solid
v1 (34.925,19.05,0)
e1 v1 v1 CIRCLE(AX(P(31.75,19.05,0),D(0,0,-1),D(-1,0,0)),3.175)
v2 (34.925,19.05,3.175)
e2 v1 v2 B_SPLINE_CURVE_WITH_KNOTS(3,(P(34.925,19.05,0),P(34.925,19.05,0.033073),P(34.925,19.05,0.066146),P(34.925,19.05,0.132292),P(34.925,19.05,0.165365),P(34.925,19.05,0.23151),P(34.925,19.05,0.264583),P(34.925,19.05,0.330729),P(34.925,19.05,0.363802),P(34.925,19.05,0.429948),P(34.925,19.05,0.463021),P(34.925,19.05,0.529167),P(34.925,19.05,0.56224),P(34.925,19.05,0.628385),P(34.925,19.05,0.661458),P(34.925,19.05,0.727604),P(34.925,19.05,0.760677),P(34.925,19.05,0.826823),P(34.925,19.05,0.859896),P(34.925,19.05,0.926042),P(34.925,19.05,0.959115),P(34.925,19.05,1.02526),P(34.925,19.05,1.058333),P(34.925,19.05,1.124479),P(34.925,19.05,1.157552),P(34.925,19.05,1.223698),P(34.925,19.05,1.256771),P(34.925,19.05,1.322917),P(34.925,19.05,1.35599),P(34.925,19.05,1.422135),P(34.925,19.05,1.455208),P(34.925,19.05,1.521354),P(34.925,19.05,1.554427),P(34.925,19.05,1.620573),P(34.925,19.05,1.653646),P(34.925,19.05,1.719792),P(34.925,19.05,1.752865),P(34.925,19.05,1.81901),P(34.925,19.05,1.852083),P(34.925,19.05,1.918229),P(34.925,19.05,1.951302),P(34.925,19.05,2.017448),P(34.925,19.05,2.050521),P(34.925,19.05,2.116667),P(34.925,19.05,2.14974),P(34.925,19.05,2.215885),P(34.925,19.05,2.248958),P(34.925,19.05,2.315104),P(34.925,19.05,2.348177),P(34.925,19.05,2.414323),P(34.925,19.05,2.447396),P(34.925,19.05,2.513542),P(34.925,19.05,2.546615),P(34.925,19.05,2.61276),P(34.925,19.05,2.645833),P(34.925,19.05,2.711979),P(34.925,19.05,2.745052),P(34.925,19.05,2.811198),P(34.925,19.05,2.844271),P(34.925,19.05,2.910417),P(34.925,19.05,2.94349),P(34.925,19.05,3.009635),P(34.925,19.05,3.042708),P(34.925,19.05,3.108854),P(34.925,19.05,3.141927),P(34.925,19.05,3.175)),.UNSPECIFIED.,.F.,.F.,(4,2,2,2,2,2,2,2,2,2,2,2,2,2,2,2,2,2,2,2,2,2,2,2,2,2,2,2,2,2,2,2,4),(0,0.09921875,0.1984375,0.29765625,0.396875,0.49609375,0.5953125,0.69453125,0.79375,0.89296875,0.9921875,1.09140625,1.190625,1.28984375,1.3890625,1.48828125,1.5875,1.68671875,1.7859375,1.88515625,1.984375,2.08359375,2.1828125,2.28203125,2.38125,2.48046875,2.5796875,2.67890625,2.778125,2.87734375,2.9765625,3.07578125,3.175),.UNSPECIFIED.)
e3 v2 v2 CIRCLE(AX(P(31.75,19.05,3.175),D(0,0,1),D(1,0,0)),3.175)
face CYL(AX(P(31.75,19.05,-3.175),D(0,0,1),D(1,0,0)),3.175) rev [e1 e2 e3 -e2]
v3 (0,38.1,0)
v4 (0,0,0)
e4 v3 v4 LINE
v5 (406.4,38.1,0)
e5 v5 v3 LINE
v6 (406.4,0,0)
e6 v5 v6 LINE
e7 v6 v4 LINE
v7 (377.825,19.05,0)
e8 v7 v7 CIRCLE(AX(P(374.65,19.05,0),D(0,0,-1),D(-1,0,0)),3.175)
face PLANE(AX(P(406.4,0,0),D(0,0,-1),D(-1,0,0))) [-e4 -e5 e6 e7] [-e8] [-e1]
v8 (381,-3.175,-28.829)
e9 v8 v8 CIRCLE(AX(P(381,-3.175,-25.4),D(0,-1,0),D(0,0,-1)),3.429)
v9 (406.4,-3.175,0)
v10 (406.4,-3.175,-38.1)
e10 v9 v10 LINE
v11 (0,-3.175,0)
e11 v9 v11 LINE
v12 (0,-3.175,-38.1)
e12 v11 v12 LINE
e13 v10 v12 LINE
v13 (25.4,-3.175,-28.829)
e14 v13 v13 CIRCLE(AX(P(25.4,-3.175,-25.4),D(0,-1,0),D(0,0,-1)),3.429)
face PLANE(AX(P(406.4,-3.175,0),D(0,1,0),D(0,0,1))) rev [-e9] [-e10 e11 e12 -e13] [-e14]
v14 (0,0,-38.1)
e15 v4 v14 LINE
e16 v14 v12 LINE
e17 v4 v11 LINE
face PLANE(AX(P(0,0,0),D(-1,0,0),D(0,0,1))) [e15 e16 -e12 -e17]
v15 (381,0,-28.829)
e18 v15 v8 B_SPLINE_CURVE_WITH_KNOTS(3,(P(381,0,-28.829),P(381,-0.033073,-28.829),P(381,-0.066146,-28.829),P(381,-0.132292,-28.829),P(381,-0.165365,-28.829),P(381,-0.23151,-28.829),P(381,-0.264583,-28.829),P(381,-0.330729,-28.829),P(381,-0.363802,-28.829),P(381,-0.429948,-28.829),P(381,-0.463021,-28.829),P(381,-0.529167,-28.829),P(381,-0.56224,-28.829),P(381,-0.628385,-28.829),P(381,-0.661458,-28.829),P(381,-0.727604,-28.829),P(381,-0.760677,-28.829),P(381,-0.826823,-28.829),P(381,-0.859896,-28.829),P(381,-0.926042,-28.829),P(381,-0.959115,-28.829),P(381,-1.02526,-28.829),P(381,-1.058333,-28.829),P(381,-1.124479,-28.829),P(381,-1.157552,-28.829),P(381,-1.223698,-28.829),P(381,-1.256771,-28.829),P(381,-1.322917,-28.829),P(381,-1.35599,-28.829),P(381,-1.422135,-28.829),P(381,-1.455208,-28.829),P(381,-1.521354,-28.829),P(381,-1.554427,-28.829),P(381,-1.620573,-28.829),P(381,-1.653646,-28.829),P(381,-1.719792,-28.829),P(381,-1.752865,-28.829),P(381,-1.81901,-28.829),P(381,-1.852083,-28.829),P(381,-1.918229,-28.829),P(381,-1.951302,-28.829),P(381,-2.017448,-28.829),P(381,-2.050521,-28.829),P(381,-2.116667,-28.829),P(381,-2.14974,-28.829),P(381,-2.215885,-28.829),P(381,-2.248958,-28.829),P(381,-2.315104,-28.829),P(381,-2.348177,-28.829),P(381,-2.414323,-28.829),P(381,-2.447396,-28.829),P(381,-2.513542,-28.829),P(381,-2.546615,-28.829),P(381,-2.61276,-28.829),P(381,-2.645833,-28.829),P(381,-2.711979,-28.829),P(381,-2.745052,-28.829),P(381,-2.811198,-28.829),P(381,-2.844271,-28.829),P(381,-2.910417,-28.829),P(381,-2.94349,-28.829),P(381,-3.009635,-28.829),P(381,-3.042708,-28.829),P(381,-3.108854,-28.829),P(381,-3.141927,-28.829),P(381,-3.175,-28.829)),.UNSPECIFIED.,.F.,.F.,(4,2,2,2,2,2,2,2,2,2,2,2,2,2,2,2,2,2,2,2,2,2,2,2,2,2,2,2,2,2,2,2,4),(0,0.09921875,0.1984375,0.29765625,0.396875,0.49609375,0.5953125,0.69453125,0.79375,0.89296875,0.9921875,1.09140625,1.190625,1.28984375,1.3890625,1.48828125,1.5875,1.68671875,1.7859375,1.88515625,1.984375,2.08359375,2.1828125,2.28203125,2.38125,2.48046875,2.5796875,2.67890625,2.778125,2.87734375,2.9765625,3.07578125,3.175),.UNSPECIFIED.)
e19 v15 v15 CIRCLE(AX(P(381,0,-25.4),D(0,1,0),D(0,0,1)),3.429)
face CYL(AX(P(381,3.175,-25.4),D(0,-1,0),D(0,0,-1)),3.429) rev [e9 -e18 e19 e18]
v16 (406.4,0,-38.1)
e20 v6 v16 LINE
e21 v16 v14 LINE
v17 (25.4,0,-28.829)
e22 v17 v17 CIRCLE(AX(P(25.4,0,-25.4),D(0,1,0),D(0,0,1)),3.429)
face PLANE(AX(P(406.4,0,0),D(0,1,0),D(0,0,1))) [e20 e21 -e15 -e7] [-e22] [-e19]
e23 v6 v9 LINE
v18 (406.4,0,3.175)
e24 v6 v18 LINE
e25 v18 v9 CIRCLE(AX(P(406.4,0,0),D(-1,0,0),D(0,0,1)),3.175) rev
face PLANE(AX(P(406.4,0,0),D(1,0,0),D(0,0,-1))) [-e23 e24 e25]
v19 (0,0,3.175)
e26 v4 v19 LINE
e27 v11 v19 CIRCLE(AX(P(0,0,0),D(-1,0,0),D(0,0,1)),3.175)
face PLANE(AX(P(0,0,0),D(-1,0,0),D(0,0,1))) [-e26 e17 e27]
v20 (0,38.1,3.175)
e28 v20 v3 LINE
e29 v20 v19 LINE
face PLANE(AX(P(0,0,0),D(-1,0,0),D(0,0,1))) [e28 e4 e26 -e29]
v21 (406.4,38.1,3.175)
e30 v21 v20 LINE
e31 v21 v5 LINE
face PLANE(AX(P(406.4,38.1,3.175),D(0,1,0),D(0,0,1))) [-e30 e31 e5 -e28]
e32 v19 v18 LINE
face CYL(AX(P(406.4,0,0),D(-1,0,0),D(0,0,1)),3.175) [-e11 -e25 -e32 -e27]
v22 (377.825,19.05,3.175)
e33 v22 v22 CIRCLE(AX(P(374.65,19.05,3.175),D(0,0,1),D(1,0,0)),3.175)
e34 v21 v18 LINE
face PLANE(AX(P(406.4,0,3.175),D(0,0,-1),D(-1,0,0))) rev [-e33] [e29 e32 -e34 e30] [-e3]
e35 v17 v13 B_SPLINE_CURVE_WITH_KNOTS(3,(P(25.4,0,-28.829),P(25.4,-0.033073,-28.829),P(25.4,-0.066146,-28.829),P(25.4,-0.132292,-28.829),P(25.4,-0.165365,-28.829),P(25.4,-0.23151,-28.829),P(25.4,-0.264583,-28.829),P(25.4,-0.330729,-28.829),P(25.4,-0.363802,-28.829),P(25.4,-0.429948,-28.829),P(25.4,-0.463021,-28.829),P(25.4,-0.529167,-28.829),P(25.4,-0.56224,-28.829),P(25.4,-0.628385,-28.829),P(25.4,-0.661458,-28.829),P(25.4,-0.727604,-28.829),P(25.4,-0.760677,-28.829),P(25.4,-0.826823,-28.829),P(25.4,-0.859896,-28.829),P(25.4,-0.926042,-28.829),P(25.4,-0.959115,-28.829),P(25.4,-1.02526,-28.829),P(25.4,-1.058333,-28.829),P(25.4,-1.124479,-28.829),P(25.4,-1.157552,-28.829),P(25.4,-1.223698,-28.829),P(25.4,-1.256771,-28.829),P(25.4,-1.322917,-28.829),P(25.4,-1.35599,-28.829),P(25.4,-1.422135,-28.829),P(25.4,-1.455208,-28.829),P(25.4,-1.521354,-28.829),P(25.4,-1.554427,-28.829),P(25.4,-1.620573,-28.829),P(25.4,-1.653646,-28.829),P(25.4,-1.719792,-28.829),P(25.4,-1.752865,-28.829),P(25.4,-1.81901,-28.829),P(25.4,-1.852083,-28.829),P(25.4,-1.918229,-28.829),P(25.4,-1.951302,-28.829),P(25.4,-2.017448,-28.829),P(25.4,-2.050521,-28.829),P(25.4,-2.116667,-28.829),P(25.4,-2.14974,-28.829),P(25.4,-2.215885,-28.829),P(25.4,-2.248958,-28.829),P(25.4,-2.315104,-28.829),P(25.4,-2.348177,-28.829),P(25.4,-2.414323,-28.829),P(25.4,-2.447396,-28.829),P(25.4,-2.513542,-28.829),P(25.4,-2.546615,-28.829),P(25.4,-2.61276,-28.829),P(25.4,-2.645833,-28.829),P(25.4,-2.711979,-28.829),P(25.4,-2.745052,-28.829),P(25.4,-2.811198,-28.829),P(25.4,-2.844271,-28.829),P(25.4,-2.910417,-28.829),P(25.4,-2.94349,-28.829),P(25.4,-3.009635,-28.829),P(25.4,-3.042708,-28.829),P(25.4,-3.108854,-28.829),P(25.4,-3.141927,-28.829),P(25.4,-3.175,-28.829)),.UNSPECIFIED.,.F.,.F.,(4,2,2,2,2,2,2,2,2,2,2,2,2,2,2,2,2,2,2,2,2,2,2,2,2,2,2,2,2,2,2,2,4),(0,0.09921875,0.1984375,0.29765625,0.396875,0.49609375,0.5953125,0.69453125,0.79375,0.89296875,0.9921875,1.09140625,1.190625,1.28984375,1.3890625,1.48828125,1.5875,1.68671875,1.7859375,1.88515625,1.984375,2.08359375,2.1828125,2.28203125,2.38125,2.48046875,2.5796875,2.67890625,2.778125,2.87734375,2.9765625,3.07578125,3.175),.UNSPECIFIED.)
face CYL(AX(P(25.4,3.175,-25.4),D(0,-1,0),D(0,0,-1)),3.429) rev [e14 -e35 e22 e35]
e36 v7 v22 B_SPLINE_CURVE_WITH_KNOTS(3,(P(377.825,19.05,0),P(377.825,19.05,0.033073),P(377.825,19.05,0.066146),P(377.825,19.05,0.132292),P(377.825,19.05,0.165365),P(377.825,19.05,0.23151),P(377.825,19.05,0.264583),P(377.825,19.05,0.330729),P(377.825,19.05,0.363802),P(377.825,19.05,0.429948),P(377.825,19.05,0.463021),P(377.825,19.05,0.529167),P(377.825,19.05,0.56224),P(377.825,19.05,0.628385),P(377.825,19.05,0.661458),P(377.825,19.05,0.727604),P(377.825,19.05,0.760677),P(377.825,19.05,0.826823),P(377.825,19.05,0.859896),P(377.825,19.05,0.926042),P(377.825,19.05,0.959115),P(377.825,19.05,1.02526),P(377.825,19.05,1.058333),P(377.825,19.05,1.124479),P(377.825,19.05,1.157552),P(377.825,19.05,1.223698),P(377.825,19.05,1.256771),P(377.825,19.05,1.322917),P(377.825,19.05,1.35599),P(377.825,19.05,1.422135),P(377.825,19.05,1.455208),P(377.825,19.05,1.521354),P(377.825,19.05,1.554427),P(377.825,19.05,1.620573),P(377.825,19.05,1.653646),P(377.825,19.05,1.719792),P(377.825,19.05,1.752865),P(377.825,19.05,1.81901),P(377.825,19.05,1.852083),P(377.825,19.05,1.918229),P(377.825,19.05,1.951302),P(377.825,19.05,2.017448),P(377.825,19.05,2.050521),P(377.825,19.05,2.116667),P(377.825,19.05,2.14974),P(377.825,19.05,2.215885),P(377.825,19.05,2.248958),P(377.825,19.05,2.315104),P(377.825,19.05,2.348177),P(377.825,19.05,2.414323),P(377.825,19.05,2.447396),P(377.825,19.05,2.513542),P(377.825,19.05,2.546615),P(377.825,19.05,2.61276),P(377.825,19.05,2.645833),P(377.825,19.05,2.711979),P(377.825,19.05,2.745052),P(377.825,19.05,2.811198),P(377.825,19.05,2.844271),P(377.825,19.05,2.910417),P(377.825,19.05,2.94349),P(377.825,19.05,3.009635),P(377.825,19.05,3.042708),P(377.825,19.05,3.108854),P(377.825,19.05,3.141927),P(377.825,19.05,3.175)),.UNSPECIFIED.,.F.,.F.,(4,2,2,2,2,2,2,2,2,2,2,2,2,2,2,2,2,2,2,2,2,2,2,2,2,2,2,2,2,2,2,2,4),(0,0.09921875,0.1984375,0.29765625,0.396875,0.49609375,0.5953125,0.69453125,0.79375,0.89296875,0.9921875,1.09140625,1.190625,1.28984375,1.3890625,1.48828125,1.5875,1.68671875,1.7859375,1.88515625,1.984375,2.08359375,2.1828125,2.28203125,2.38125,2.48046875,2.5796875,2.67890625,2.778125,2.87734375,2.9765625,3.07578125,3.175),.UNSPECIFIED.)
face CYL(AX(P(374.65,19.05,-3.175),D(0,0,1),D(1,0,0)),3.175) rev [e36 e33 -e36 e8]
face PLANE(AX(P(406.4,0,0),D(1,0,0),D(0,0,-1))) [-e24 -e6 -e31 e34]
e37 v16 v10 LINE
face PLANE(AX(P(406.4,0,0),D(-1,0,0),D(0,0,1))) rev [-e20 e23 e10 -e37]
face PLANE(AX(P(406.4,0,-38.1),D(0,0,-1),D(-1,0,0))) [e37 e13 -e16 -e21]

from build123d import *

# Parameters (mm, degrees)
BASE_FLANGE1_DEPTH = 406.4
SKETCH6_R          = 3.175
CUT_EXTRUDE1_DEPTH = 6.35
SKETCH7_R          = 3.429
CUT_EXTRUDE2_DEPTH = 6.35


# Read off the part's stored shape, not the designer's step: Base-Flange1
with BuildPart() as part:
    # Base-Flange1 outline → Base-Flange1 (new body)
    with BuildSketch(Plane(origin=(0, 0, 0), x_dir=(0, 0, -1), z_dir=(1, 0, 0))):
        with BuildLine():
            Line((0, -3.175), (38.1, -3.175))
            Line((38.1, -3.175), (38.1, 0))
            Line((38.1, 0), (0, 0))
            Line((0, 0), (0, 38.1))
            Line((0, 38.1), (-3.175, 38.1))
            Line((-3.175, 38.1), (-3.175, 0))
            ThreePointArc((-3.175, 0), (-2.24506403, -2.24506403), (0, -3.175))
        make_face()
    extrude(amount=BASE_FLANGE1_DEPTH)

    # Sketch6 → Cut-Extrude1 (cut)
    with BuildSketch(Plane.XY.offset(3.175)):
        with Locations((31.75, 19.05)):
            Circle(SKETCH6_R)
        with Locations((374.65, 19.05)):
            Circle(SKETCH6_R)
    extrude(amount=-CUT_EXTRUDE1_DEPTH, mode=Mode.SUBTRACT)

    # Sketch7 → Cut-Extrude2 (cut)
    with BuildSketch(Plane.XZ.offset(3.175)):
        with Locations(Location((25.4, -25.4, 0), (0, 0, 270))):
            Circle(SKETCH7_R)
        with Locations(Location((381, -25.4, 0), (0, 0, 270))):
            Circle(SKETCH7_R)
    extrude(amount=-CUT_EXTRUDE2_DEPTH, mode=Mode.SUBTRACT)


solid = part.part
